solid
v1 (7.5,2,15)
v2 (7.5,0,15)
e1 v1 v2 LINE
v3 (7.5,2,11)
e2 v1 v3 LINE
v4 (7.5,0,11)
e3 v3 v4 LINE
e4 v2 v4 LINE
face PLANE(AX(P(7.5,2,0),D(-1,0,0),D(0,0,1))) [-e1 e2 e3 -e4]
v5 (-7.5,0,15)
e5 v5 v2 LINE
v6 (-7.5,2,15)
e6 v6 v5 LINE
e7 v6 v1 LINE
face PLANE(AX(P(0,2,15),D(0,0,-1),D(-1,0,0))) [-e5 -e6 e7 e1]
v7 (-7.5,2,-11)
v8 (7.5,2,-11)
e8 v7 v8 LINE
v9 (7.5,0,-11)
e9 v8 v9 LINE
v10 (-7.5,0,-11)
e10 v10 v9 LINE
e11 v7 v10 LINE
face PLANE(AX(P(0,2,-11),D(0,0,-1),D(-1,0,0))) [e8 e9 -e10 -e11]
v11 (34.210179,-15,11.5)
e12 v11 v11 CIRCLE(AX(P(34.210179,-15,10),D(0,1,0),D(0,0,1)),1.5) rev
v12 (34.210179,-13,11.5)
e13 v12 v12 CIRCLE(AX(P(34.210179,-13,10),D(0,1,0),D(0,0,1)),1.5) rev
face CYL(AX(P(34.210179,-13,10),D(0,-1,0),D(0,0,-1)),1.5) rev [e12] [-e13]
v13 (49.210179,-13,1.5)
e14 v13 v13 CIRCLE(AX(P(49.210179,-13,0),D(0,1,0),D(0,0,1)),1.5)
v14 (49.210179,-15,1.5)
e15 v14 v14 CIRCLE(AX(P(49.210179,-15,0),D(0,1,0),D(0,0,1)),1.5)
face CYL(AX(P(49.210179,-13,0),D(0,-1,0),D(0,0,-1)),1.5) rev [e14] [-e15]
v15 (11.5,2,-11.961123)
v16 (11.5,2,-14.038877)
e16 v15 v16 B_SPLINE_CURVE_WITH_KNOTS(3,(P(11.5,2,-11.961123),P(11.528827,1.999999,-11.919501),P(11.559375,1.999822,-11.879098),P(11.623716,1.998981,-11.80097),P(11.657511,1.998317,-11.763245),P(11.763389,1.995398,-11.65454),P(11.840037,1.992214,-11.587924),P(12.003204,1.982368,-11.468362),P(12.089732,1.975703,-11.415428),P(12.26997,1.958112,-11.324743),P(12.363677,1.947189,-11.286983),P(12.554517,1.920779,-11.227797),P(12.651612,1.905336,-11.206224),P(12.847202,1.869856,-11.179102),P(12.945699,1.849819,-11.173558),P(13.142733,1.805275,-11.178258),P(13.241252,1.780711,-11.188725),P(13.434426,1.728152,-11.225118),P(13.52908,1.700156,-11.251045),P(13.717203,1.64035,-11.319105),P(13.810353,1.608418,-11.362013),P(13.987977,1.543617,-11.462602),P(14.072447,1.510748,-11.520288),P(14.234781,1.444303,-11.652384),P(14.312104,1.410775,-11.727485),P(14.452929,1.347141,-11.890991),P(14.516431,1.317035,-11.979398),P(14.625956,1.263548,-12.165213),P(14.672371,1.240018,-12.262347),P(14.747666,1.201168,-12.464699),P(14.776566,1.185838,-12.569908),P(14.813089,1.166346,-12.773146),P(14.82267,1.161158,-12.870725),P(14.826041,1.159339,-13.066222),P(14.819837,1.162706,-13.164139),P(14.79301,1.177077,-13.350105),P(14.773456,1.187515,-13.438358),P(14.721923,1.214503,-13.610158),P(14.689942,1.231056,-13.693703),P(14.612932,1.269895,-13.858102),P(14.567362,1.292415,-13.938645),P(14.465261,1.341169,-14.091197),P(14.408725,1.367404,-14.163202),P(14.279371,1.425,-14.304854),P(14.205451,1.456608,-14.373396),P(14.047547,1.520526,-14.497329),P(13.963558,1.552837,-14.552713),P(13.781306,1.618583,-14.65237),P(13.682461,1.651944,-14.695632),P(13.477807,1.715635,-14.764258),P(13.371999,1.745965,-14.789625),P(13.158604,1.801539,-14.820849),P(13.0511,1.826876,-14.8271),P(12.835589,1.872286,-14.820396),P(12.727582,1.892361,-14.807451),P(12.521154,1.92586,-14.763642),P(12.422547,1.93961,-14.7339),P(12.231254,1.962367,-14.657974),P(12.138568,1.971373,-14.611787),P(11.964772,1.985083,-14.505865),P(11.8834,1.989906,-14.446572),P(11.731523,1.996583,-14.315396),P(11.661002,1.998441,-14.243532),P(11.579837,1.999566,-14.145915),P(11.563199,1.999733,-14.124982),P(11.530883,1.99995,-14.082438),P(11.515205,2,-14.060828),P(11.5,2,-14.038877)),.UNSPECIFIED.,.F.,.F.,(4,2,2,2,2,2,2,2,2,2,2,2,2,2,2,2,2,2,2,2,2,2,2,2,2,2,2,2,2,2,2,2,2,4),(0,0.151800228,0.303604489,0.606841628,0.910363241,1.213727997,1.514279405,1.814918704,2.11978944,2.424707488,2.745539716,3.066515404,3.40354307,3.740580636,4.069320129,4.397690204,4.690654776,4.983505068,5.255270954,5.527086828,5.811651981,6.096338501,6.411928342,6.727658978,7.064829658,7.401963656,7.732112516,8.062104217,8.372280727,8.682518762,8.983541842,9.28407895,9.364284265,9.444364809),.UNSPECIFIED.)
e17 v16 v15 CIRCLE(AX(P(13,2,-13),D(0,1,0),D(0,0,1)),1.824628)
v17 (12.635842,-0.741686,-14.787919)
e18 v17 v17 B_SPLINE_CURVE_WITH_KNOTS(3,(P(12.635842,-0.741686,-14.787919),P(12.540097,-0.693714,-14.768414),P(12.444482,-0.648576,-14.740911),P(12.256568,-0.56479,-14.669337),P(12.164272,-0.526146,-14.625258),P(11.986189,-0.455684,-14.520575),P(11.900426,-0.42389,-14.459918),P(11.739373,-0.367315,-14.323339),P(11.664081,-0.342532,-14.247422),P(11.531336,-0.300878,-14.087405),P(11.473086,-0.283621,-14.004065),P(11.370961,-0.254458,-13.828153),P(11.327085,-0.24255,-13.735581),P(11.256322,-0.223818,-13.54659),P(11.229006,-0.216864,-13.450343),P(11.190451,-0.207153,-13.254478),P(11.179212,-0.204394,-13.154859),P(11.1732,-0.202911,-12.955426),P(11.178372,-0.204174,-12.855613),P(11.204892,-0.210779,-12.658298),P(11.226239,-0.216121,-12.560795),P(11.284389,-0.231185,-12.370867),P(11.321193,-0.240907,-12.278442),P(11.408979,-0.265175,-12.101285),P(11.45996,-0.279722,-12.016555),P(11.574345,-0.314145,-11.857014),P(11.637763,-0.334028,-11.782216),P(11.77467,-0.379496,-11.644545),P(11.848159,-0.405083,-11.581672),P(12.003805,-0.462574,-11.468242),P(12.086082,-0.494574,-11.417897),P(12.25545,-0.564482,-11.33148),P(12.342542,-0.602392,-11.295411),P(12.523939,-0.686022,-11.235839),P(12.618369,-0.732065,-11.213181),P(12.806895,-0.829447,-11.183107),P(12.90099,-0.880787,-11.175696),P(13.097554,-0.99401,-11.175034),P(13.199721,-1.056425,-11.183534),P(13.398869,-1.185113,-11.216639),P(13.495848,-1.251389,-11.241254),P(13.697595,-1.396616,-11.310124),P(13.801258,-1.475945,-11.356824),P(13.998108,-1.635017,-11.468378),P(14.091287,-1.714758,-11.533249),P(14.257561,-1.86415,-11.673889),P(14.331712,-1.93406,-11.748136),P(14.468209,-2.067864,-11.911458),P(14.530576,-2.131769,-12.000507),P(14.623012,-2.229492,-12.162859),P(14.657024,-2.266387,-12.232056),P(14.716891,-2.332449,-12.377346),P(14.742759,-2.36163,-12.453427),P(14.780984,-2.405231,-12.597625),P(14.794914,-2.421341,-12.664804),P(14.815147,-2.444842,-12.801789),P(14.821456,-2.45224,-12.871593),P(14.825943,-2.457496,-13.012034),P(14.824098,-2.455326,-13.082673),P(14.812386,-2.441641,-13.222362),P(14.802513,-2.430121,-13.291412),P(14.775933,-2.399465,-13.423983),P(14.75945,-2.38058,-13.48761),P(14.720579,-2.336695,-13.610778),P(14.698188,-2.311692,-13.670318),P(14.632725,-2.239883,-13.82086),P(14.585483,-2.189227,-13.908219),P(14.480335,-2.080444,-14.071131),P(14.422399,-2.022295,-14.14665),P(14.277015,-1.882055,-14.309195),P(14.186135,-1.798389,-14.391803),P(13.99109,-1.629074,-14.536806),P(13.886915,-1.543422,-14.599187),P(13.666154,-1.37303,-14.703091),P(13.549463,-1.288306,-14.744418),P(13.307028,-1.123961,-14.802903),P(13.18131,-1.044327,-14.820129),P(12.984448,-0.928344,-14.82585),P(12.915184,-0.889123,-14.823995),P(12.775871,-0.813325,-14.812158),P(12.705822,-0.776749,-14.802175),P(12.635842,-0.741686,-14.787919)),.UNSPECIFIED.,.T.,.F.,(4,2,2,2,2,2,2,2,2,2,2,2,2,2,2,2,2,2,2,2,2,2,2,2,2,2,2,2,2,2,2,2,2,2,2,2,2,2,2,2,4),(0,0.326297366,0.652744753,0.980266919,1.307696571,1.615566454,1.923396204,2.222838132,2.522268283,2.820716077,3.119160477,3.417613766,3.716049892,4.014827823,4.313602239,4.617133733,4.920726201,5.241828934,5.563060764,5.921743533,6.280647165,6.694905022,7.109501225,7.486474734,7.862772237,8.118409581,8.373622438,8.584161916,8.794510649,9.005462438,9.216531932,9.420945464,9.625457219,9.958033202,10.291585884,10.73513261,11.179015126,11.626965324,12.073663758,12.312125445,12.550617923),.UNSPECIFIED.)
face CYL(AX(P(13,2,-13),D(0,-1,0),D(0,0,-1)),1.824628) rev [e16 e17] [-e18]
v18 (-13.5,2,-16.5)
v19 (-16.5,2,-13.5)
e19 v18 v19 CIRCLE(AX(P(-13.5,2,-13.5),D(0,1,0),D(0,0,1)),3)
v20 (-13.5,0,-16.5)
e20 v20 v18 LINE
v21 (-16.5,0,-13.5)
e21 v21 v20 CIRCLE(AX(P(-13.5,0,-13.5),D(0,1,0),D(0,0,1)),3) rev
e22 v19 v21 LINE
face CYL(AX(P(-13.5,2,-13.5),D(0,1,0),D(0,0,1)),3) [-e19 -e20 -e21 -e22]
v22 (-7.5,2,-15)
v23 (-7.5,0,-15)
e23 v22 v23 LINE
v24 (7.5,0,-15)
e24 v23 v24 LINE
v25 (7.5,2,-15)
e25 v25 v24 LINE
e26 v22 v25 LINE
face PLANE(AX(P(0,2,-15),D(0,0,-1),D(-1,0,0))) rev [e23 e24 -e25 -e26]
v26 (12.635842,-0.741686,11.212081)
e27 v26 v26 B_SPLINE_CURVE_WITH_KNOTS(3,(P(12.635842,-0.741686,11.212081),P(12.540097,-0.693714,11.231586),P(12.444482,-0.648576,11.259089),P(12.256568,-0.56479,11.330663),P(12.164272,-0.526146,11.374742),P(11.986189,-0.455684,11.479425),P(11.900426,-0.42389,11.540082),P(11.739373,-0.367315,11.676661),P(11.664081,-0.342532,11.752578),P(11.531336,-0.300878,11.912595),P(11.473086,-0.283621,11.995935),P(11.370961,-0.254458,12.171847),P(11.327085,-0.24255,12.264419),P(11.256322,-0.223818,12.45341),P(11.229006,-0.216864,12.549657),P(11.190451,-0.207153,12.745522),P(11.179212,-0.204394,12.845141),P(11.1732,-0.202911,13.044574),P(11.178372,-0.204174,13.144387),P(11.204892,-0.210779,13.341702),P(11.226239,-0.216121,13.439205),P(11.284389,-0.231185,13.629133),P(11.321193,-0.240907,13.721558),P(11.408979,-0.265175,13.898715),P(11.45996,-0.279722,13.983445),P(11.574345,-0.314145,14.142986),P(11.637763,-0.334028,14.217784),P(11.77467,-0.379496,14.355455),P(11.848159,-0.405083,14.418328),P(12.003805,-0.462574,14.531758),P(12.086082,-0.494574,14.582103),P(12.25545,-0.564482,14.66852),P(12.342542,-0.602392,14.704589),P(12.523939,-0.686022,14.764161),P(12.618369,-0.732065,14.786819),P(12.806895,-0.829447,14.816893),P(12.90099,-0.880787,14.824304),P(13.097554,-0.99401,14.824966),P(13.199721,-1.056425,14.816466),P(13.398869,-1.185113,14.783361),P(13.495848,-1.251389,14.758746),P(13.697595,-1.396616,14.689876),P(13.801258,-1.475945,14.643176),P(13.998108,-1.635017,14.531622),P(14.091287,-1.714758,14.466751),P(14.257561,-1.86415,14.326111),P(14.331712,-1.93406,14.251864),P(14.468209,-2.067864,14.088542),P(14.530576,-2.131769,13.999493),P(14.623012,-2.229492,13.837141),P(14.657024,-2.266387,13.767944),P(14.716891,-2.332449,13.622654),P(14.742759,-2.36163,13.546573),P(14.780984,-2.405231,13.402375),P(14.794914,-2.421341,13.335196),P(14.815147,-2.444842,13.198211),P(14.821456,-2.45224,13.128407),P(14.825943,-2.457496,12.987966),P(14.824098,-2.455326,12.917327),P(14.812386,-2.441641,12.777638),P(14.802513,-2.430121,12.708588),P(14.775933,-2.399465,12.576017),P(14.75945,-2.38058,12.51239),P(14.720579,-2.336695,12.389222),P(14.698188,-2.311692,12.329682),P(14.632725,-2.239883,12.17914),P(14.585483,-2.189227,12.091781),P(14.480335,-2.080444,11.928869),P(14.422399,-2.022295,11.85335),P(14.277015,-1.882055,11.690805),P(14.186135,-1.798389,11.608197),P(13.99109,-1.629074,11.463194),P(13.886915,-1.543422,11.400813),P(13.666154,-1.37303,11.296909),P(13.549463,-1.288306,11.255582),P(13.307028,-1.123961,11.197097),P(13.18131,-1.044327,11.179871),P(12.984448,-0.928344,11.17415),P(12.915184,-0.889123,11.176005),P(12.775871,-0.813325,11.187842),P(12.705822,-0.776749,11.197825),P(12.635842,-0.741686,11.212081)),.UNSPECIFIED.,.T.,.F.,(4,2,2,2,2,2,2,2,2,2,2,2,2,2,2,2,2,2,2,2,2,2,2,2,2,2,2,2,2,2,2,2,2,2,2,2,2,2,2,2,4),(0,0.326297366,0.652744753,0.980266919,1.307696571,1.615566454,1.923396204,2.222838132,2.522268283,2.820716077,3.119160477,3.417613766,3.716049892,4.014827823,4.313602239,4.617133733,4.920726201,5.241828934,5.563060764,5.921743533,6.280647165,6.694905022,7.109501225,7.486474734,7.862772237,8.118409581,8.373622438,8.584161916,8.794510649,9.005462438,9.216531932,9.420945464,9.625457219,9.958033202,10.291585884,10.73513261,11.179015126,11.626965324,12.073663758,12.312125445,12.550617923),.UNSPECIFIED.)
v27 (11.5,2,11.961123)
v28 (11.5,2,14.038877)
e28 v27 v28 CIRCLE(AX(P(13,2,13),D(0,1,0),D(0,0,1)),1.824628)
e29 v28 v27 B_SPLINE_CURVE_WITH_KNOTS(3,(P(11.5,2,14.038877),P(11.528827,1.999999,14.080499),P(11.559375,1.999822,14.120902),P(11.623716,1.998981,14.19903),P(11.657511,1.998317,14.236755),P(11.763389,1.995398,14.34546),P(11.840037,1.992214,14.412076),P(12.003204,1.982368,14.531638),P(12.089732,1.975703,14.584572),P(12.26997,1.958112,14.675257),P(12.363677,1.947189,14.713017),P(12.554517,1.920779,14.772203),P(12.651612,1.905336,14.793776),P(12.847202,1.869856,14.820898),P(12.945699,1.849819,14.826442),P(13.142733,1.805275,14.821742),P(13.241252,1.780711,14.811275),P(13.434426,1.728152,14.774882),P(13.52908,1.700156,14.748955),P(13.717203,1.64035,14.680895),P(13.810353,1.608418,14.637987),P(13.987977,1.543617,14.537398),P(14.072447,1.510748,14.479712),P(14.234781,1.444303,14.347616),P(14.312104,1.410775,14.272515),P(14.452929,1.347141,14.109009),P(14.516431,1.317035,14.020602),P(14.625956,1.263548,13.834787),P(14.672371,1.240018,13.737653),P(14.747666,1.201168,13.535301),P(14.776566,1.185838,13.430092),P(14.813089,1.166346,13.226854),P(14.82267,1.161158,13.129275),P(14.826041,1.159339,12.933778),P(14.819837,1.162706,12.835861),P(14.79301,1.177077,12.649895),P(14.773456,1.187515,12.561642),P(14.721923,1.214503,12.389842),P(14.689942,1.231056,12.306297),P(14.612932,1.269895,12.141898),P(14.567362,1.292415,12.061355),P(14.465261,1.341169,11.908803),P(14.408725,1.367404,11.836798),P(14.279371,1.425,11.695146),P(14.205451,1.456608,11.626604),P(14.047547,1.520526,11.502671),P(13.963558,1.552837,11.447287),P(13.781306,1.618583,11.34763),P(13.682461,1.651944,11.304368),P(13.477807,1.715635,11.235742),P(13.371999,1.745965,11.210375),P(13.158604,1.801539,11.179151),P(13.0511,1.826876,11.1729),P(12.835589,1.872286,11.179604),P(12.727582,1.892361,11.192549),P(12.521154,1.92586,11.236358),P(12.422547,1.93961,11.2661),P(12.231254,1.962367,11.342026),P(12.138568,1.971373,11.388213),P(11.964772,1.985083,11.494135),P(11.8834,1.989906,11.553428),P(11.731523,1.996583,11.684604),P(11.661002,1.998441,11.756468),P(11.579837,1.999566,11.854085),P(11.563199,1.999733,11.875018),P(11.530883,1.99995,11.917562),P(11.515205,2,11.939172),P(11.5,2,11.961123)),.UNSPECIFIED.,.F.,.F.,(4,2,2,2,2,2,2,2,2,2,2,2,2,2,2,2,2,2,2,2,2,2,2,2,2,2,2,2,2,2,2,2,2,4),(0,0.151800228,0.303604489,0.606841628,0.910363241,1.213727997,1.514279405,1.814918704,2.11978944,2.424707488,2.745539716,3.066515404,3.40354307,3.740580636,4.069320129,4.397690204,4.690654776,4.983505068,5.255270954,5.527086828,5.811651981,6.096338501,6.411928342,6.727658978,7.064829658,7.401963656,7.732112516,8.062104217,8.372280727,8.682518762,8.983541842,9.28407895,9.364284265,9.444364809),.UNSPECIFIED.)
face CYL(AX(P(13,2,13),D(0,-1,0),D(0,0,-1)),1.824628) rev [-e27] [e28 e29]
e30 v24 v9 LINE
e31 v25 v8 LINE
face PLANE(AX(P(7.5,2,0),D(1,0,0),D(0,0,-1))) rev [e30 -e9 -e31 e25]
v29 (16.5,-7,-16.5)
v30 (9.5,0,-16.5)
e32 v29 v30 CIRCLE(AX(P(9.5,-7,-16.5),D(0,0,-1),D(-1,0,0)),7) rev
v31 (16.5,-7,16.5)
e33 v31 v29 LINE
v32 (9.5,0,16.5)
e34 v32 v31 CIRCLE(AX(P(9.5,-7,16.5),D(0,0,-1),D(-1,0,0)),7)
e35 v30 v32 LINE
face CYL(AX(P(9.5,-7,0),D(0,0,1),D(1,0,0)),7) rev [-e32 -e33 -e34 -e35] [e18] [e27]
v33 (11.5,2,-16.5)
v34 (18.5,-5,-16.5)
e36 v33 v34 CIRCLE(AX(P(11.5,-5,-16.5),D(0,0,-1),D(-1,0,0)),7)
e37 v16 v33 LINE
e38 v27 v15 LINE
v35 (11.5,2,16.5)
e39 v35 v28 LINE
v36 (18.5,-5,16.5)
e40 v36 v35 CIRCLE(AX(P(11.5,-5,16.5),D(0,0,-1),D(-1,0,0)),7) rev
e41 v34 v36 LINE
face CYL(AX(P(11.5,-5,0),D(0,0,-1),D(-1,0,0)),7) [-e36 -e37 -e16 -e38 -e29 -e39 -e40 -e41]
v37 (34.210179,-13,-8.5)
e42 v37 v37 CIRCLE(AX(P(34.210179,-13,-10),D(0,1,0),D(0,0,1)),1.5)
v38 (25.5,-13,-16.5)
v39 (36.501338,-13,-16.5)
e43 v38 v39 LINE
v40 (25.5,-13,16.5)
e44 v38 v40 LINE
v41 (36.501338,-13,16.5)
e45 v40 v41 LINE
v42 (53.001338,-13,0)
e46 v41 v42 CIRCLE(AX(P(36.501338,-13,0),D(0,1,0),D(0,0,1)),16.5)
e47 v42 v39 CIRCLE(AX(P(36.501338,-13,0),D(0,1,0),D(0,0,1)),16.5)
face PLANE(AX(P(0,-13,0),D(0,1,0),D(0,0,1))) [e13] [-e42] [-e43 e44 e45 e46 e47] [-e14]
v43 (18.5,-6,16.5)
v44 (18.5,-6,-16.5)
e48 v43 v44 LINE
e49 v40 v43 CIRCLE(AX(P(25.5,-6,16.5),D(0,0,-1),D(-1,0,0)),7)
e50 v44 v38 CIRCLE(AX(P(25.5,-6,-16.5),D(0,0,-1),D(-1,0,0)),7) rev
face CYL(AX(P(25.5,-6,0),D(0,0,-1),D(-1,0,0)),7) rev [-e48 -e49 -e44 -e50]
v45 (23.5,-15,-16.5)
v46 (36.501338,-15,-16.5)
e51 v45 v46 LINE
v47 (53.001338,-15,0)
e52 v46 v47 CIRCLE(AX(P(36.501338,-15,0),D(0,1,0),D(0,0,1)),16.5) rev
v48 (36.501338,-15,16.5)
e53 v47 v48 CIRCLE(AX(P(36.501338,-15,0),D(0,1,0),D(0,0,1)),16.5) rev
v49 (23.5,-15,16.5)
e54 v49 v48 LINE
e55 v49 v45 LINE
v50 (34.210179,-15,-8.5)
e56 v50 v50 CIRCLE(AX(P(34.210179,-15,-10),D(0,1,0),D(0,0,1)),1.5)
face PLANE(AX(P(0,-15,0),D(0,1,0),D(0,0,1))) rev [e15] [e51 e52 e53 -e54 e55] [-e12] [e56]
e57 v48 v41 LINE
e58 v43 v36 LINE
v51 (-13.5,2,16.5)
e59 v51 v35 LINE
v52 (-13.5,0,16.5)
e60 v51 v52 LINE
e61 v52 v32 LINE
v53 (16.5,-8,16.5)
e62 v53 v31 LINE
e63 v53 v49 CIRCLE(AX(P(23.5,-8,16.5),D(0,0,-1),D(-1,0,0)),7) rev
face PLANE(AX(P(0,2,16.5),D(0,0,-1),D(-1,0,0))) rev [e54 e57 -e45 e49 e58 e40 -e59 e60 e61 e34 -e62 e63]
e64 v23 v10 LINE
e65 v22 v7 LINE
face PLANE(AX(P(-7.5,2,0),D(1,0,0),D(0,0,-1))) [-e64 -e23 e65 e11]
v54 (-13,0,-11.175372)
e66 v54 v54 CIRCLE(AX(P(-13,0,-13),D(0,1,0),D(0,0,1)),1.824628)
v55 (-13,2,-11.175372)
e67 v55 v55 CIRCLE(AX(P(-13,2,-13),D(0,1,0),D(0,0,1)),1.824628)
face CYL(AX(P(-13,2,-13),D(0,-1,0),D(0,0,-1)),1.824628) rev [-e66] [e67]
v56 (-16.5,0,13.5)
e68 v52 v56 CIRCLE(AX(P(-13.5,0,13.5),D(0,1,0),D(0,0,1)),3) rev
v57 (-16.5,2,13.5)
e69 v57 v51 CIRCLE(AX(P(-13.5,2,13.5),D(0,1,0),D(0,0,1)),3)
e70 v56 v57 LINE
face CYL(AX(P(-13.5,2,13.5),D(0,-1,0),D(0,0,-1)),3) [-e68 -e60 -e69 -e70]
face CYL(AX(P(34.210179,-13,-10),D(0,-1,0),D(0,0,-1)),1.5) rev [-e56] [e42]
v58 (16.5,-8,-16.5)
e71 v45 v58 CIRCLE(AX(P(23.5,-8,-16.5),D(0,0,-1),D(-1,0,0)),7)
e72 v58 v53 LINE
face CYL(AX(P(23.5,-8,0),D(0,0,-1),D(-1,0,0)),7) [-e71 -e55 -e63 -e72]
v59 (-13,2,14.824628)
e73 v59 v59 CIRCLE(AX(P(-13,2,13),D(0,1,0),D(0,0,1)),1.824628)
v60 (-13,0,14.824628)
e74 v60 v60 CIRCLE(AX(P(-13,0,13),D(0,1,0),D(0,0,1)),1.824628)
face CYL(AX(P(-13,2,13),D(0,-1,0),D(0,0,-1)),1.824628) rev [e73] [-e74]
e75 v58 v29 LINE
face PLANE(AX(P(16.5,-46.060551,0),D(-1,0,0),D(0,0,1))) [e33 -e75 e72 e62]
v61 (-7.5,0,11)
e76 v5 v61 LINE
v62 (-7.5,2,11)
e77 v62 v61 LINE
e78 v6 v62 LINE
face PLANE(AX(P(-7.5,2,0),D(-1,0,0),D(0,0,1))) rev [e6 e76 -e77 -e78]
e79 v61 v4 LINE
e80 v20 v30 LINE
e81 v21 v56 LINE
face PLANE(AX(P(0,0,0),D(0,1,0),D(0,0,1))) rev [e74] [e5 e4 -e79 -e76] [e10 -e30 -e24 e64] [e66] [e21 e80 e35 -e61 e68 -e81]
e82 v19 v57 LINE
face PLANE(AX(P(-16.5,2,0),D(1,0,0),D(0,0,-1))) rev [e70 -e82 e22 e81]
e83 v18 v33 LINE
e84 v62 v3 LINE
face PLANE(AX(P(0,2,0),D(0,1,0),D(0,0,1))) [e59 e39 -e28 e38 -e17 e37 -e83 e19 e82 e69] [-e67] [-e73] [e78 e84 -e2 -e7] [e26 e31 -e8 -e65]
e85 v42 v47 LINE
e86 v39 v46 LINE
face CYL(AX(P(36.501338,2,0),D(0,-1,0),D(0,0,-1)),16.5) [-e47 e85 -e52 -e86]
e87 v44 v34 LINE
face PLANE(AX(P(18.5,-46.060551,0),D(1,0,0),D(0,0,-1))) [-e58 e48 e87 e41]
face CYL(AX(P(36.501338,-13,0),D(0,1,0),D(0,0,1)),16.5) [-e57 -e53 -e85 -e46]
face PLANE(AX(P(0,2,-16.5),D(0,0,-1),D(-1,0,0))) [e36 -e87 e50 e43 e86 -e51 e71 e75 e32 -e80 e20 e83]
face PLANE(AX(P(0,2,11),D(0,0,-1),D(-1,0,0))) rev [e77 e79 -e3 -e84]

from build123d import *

# Parameters (mm, degrees)
SKETCH1_W                = 33
SKETCH1_H                = 33
SKETCH1_R                = 1.824627508
SKETCH1_W_2              = 15
SKETCH1_H_2              = 4
BOSS_EXTRUDE1_DEPTH      = 2
SKETCH2_W                = 36.501337607
SKETCH2_H                = 33
SKETCH2_R                = 1.5
BOSS_EXTRUDE2_DEPTH      = 2
BOSS_EXTRUDE3_DEPTH      = 2
BOSS_EXTRUDE3_DEPTH_BACK = 15
SKETCH1_3_W              = 2
SKETCH1_3_H              = 33
FILLET1_R                = 7
FILLET2_R                = 16.5
FILLET3_R                = 3


# Some blends are built 0.0001 mm under size
with BuildPart() as part:
    # Sketch1 → Boss-Extrude1 (new body)
    with BuildSketch(Plane(origin=(0, 0, 0), x_dir=(1, 0, 0), z_dir=(0, 1, 0))):
        Rectangle(SKETCH1_W, SKETCH1_H)
        with Locations(Location((-13, -13, 0), (0, 0, 270))):
            Circle(SKETCH1_R, mode=Mode.SUBTRACT)
        with Locations(Location((13, -13, 0), (0, 0, 270))):
            Circle(SKETCH1_R, mode=Mode.SUBTRACT)
        with Locations(Location((13, 13, 0), (0, 0, 270))):
            Circle(SKETCH1_R, mode=Mode.SUBTRACT)
        with Locations(Location((-13, 13, 0), (0, 0, 270))):
            Circle(SKETCH1_R, mode=Mode.SUBTRACT)
        with Locations((0, 13)):
            Rectangle(SKETCH1_W_2, SKETCH1_H_2, mode=Mode.SUBTRACT)
        with Locations((0, -13)):
            Rectangle(SKETCH1_W_2, SKETCH1_H_2, mode=Mode.SUBTRACT)
    extrude(amount=BOSS_EXTRUDE1_DEPTH)



with BuildPart() as body_2:
    # Sketch2 → Boss-Extrude2 (new body)
    with BuildSketch(Plane(origin=(0, -15, 0), x_dir=(1, 0, 0), z_dir=(0, 1, 0))):
        with Locations((34.750668804, 0)):
            Rectangle(SKETCH2_W, SKETCH2_H)
        with Locations(Location((34.210179074, 10, 0), (0, 0, 270))):
            Circle(SKETCH2_R, mode=Mode.SUBTRACT)
        with Locations(Location((49.210179074, 0, 0), (0, 0, 270))):
            Circle(SKETCH2_R, mode=Mode.SUBTRACT)
        with Locations(Location((34.210179074, -10, 0), (0, 0, 270))):
            Circle(SKETCH2_R, mode=Mode.SUBTRACT)
    extrude(amount=BOSS_EXTRUDE2_DEPTH)


with BuildPart() as part_1:
    add(part.part)

    add(body_2.part)  # Boss-Extrude3 merges body 2
    # Sketch1<3> → Boss-Extrude3 (add, two sides: drawn at the far end of the back side and taken through both)
    with BuildSketch(Plane(origin=(0, 0, 0), x_dir=(1, 0, 0), z_dir=(0, 1, 0)).offset(-BOSS_EXTRUDE3_DEPTH_BACK)):
        with Locations((17.5, 0)):
            Rectangle(SKETCH1_3_W, SKETCH1_3_H)
    extrude(amount=BOSS_EXTRUDE3_DEPTH + BOSS_EXTRUDE3_DEPTH_BACK)

    # Fillet1
    # the kernel refuses this fillet: 7 mm, written as the material it adds along each edge
    with BuildSketch(Plane(origin=(16.5, 0, -16.5), x_dir=(0, -1, 0), z_dir=(0, 0, 1))) as fillet1_piece_1_section:
        with BuildLine():
            CenterArc((FILLET1_R, -FILLET1_R), FILLET1_R, 90, 90)
            Line((0, -FILLET1_R), (0, 0))
            Line((0, 0), (FILLET1_R, 0))
        make_face()
    fillet1_piece_1 = extrude(amount=33, mode=Mode.PRIVATE)
    fillet1_piece_1 = fillet1_piece_1 - Plane(origin=(13, -1.648536781, -13), x_dir=(0, 0, 1), z_dir=(0, -1, 0)) * Cylinder(1.824627508, 94, mode=Mode.PRIVATE)
    fillet1_piece_1 = fillet1_piece_1 - Plane(origin=(13, -1.648536781, 13), x_dir=(0, 0, 1), z_dir=(0, -1, 0)) * Cylinder(1.824627508, 94, mode=Mode.PRIVATE)
    add(fillet1_piece_1)
    with BuildSketch(Plane(origin=(18.5, -13, 16.5), x_dir=(0, 1, 0), z_dir=(0, 0, -1))) as fillet1_piece_2:
        with BuildLine():
            CenterArc((FILLET1_R, FILLET1_R), FILLET1_R, 180, 90)
            Line((0, FILLET1_R), (0, 0))
            Line((0, 0), (FILLET1_R, 0))
        make_face()
    extrude(amount=33)
    # the kernel refuses this fillet: 7 mm, written as the material it takes off along each edge
    with BuildSketch(Plane(origin=(18.5, 2, 34), x_dir=(-1, 0, 0), z_dir=(0, 0, -1)), Plane(origin=(16.5, -15, 34), x_dir=(1, 0, 0), z_dir=(0, 0, -1))) as fillet1_2_piece_1:
        with BuildLine():
            CenterArc((FILLET1_R, -FILLET1_R), FILLET1_R, 90, 90)
            Line((0, -FILLET1_R), (0, 0))
            Line((0, 0), (FILLET1_R, 0))
        make_face()
    extrude(amount=68, mode=Mode.SUBTRACT)

    # Fillet2
    fillet2_edges = [part_1.edges().sort_by_distance(p)[0] for p in [
        (53.001337607, -14, -16.5),
        (53.001337607, -14, 16.5),
    ]]
    fillet(fillet2_edges, radius=FILLET2_R - 0.0001)  # a hair under: the kernel refuses the full size

    # Fillet3
    fillet3_edges = [part_1.edges().sort_by_distance(p)[0] for p in [
        (-16.5, 1, 16.5),
        (-16.5, 1, -16.5),
    ]]
    fillet(fillet3_edges, radius=FILLET3_R)


solid = part_1.part
